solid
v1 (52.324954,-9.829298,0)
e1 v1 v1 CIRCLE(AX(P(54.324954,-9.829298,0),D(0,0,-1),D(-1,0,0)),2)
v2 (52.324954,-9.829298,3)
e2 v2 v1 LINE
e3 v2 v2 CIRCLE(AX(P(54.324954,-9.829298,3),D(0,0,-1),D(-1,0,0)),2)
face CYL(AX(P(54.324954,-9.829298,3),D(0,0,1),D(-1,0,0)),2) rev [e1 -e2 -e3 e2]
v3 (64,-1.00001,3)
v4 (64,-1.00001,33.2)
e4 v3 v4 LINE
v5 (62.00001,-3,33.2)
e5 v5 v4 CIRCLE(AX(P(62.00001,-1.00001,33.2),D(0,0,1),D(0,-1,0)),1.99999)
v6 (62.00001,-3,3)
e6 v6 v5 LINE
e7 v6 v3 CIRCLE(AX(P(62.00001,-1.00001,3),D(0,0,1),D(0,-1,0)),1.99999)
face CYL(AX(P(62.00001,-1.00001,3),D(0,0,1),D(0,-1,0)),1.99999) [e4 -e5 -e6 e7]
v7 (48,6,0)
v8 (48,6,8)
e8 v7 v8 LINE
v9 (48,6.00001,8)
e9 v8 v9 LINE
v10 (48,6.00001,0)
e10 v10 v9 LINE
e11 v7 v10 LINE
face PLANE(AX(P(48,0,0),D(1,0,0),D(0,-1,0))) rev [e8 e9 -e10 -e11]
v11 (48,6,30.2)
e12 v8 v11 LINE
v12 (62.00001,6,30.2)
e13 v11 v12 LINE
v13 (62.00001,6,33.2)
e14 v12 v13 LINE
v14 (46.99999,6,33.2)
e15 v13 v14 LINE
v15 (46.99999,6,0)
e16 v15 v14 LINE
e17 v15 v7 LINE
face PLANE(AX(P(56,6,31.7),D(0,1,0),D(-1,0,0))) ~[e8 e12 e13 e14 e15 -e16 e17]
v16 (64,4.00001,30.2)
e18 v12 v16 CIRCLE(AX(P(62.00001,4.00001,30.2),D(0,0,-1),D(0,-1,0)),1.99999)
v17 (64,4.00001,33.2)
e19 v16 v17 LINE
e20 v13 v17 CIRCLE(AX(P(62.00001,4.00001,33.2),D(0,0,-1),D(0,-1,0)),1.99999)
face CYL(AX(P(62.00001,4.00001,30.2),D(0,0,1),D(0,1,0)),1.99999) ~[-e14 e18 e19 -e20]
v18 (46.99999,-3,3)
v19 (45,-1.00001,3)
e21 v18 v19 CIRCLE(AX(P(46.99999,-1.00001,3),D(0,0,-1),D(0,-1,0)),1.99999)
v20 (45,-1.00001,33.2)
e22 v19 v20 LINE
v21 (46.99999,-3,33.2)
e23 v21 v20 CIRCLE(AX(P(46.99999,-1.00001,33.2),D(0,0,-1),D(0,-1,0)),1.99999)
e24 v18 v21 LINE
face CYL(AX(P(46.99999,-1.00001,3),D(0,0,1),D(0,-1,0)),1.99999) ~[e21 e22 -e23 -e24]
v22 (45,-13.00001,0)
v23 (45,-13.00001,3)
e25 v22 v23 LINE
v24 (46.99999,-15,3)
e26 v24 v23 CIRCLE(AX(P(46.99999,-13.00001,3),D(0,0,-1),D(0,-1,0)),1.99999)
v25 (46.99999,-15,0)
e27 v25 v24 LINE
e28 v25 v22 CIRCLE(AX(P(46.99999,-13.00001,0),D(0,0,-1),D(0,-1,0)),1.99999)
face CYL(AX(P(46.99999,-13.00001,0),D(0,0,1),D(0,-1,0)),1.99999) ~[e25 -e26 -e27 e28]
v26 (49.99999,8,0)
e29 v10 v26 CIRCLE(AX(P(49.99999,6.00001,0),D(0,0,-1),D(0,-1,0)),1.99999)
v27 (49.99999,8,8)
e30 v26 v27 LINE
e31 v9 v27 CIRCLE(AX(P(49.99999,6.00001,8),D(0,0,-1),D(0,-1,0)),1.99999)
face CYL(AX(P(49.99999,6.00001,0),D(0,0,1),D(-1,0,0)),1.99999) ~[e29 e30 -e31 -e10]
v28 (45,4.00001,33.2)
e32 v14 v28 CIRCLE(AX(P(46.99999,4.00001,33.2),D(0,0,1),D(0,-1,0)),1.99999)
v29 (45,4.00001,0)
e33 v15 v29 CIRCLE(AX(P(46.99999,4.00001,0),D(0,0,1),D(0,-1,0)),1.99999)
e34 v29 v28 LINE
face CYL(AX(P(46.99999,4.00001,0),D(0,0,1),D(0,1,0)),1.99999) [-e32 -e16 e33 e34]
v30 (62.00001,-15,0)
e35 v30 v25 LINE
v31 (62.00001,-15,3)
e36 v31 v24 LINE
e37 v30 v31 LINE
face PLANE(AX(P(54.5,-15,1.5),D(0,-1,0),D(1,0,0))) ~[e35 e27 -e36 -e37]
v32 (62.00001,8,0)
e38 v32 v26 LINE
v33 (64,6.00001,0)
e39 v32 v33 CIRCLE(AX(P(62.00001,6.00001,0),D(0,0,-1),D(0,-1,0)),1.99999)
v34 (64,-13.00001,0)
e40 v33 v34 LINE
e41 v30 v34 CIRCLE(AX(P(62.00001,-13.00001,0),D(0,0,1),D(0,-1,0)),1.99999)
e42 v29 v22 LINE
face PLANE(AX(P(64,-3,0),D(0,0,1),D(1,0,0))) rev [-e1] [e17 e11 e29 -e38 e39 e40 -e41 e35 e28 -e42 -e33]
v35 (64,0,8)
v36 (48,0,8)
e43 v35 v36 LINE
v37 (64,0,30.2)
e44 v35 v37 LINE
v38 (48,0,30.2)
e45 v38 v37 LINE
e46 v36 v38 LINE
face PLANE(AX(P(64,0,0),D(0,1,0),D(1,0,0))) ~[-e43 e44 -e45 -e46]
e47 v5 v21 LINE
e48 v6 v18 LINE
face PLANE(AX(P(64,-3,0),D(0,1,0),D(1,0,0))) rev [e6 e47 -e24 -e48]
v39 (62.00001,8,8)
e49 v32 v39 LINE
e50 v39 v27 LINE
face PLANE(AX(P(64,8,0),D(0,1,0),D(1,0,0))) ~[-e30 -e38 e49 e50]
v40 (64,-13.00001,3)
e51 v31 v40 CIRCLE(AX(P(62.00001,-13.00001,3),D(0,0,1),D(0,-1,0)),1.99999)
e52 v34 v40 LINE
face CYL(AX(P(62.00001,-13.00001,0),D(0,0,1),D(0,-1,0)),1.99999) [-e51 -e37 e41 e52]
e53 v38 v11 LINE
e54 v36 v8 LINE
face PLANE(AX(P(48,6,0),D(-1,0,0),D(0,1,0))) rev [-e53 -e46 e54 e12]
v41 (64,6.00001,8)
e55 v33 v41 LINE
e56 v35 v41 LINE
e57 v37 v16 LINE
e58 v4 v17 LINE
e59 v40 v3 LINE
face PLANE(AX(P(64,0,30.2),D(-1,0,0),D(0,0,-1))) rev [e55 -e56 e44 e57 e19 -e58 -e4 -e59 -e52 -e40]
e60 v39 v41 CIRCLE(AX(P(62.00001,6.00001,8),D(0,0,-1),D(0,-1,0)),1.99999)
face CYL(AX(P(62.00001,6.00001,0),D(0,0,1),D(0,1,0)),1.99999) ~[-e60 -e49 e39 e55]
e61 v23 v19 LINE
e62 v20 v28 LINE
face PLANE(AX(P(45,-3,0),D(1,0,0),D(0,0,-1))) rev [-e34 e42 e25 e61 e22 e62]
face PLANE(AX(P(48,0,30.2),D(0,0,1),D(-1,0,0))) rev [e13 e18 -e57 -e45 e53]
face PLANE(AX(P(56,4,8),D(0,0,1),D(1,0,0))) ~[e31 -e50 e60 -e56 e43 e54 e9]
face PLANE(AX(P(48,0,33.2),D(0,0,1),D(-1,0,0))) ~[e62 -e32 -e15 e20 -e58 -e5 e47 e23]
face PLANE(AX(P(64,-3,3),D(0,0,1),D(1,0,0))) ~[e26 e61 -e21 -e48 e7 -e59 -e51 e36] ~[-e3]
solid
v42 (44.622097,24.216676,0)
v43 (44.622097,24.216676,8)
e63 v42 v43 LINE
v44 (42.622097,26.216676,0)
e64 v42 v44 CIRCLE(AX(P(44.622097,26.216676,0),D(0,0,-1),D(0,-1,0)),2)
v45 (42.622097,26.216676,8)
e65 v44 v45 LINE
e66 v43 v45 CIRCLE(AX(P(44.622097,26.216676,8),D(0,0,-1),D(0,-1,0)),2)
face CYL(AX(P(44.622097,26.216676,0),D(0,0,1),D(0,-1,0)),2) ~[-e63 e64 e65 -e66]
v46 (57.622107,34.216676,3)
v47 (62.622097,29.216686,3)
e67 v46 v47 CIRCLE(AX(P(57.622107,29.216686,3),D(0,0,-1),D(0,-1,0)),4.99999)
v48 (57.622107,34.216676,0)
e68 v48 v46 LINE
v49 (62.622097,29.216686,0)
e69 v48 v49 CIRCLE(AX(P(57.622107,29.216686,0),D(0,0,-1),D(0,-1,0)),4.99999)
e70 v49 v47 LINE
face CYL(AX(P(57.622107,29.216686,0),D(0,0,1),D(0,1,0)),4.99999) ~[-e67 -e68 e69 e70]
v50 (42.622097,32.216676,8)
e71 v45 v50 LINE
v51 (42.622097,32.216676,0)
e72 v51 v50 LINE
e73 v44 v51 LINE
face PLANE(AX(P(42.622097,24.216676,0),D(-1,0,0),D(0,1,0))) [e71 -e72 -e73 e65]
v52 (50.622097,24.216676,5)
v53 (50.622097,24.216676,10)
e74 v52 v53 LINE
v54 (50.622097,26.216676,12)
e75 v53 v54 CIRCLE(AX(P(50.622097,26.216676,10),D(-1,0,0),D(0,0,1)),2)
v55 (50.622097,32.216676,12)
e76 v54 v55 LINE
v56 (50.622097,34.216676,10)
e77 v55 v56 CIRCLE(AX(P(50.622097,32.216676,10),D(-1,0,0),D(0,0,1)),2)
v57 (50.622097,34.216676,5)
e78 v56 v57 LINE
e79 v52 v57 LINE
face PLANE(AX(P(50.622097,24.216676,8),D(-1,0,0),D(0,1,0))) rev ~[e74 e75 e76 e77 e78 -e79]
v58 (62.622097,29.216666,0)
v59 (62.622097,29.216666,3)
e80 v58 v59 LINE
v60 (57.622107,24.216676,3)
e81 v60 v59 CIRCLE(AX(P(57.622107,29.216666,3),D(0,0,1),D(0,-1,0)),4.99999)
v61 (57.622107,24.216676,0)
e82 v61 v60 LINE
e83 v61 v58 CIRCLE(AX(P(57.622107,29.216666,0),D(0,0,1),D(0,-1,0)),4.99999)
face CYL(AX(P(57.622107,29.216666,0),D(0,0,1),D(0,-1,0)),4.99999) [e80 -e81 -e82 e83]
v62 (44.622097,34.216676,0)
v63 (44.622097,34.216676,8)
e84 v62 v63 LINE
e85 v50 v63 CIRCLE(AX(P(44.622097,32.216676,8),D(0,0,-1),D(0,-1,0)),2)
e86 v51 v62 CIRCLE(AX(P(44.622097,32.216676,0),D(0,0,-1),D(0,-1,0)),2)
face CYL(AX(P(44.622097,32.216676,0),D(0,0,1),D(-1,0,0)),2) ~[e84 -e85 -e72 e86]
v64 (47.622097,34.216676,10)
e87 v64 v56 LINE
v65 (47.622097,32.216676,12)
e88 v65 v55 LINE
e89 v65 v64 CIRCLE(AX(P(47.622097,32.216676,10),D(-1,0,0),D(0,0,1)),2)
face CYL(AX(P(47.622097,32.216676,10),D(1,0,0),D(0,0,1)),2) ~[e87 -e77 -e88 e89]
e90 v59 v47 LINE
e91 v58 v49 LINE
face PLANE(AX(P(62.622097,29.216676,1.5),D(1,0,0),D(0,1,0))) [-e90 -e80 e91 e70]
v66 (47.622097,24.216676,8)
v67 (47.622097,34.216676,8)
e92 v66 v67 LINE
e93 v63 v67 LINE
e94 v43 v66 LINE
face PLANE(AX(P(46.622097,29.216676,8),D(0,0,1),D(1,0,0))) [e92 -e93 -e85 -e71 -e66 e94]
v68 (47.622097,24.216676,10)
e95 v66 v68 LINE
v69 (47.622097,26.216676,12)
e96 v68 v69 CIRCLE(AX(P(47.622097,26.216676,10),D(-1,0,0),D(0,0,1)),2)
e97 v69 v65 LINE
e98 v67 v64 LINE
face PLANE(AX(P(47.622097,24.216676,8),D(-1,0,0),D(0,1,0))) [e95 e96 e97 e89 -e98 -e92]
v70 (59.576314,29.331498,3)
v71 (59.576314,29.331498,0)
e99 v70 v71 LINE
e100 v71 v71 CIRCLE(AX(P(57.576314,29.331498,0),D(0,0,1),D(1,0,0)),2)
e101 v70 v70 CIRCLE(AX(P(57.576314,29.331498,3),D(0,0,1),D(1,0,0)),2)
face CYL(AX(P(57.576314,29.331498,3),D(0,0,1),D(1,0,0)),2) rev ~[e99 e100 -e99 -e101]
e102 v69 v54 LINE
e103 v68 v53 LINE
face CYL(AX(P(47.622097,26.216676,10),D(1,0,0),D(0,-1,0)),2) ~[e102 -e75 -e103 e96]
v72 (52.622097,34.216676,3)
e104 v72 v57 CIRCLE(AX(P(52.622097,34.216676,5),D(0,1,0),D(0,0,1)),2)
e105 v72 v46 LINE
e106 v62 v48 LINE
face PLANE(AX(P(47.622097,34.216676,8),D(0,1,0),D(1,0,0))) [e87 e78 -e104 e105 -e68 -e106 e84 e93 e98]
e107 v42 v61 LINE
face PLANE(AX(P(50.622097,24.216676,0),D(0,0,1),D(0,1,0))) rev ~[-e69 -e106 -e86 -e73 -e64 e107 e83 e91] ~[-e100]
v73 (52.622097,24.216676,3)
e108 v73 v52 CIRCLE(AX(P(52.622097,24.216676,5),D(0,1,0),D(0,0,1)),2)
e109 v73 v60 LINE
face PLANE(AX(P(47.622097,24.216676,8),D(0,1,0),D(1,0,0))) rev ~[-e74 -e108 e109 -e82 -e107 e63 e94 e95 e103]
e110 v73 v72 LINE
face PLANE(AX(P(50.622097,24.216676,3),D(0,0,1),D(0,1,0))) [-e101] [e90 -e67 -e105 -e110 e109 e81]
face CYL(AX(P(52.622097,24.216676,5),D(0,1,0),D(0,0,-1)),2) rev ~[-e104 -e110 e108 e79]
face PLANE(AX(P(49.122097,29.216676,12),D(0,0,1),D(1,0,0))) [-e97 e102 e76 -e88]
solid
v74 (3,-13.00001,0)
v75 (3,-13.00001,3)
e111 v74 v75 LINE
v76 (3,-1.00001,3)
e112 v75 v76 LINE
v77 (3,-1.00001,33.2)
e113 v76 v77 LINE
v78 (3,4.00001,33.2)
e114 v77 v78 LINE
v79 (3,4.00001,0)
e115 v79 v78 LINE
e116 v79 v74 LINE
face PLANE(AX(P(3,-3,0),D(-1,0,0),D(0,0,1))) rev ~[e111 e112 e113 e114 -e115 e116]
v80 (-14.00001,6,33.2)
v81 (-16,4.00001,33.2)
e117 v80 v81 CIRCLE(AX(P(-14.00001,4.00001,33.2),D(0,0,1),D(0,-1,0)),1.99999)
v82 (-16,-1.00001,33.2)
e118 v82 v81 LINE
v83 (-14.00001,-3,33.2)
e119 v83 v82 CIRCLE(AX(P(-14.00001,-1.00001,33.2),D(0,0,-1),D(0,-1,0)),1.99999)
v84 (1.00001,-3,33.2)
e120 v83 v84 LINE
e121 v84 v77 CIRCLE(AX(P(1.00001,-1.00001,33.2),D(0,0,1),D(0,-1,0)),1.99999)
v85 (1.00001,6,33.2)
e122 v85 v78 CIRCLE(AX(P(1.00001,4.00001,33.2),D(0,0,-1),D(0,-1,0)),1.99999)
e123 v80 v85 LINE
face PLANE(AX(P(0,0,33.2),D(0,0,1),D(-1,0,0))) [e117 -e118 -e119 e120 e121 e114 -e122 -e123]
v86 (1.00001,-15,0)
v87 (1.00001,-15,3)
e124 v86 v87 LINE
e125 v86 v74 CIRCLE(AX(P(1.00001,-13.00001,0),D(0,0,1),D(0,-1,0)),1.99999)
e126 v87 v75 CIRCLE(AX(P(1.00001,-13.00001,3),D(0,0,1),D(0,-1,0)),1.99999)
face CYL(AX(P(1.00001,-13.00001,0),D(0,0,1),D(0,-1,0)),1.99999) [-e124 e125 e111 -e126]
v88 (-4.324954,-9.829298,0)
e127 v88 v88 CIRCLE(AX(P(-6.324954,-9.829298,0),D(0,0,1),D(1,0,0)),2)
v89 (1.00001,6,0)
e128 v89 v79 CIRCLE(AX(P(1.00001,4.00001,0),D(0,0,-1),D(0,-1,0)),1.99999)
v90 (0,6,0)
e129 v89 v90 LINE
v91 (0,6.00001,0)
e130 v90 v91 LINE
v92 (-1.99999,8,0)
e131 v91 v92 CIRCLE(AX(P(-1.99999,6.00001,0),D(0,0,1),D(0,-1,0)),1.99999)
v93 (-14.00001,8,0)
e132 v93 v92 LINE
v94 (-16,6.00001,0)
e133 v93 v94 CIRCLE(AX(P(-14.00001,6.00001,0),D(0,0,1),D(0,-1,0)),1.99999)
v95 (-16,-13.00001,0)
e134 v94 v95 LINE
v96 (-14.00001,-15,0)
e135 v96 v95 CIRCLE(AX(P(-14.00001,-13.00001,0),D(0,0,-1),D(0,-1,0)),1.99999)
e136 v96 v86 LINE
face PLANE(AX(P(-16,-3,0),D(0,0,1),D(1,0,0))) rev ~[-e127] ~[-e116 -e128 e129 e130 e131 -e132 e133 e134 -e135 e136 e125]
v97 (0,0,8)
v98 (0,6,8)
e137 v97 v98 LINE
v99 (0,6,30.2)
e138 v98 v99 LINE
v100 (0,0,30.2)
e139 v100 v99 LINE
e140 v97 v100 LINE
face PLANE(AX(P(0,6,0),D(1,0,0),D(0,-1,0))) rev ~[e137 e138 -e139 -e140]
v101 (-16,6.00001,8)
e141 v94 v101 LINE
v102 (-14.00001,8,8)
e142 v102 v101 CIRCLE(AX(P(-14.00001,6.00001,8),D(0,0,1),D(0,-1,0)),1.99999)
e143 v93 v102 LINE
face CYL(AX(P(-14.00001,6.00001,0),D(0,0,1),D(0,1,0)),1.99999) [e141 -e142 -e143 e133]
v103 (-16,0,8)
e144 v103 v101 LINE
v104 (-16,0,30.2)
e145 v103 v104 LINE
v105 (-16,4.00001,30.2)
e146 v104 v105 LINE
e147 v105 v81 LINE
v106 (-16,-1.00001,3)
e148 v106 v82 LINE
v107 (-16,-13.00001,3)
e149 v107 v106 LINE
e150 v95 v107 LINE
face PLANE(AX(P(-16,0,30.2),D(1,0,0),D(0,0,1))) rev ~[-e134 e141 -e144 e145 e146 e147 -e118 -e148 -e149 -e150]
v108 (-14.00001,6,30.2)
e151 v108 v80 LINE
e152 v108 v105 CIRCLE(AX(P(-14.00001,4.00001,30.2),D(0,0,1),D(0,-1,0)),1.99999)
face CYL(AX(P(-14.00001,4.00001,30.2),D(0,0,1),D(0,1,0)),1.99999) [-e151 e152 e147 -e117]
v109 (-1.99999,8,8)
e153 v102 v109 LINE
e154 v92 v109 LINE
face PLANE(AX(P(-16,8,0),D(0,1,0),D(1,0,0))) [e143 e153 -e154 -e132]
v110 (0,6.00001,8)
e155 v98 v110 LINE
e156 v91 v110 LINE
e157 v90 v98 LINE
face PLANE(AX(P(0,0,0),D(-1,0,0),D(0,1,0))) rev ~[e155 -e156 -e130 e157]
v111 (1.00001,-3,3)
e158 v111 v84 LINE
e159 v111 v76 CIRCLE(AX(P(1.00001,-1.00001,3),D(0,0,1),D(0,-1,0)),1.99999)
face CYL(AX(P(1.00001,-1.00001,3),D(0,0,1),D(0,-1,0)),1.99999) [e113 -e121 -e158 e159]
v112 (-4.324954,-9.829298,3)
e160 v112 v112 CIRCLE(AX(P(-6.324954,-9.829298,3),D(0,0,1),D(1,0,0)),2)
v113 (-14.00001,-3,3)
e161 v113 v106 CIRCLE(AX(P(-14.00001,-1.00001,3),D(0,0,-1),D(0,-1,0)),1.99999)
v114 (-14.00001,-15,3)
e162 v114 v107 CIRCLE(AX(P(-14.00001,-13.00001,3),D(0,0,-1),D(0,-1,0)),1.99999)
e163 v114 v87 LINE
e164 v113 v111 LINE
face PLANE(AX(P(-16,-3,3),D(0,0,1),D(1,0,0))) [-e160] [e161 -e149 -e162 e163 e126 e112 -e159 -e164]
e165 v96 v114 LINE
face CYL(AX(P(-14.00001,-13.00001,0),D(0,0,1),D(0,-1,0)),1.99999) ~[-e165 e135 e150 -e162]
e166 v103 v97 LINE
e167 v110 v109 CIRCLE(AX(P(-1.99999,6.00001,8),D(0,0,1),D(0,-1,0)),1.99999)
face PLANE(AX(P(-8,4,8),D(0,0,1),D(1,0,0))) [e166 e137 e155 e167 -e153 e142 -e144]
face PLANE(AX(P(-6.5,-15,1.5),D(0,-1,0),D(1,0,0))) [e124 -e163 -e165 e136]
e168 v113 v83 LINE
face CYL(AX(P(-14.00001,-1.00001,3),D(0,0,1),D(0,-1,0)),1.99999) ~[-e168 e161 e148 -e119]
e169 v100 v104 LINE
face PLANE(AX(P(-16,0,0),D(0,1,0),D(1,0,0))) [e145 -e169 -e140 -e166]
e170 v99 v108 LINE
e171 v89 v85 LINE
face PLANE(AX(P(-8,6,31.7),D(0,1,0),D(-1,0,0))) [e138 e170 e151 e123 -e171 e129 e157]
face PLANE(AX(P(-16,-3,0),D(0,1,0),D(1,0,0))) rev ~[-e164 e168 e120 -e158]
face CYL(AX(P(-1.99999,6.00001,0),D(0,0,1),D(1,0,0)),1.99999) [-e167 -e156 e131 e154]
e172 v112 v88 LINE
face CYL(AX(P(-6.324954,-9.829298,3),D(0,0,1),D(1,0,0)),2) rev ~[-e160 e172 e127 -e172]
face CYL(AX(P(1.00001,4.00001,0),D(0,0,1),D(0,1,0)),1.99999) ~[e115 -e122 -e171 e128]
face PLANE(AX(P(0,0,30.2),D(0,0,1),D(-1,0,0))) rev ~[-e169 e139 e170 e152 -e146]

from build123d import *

# Parameters (mm, degrees)
F0_W      = 16
F0_H      = 8
F1_DEPTH  = 8
F2_W      = 16
F2_H      = 3
F3_DEPTH  = 33.2
F4_W      = 19
F4_H      = 3
F5_DEPTH  = 12
F6_R      = 2
F7_DEPTH  = 3
F8_W      = 16
F8_H      = 3
F9_DEPTH  = 6
F10_R     = 1.99999
F13_W     = 8
F13_H     = 10
F14_DEPTH = 8
F15_W     = 10
F15_H     = 3
F16_DEPTH = 12
F17_W     = 3
F17_H     = 10
F18_DEPTH = 4
F19_R     = 2
F20_DEPTH = 3
F21_R     = 4.99999
F22_R     = 2


# Not quite as in the source:
# - a fillet or chamfer is up to 0.001 mm smaller than in the source, because OpenCascade refuses the exact size


with BuildPart() as f1:
    # F0 (on Top) → F1 (new body)
    with BuildSketch(Plane.XY):
        with Locations((-8, 4)):
            Rectangle(F0_W, F0_H)
    extrude(amount=F1_DEPTH)

    # F2 (on Top) → F3 (join)
    with BuildSketch(Plane.XY):
        with Locations((-8, -1.5)):
            Rectangle(F2_W, F2_H)
        Polygon((0, 6), (0, 0), (0, -3), (3, -3), (3, 6), align=None)
    extrude(amount=F3_DEPTH)

    # F4 (on face) → F5 (join)
    with BuildSketch(Plane.XZ.offset(3)):
        with Locations((-6.5, 1.5)):
            Rectangle(F4_W, F4_H)
    extrude(amount=F5_DEPTH)

    # F6 (on face) → F7 (cut, through all)
    with BuildSketch(Plane.XY.offset(3)):
        with Locations((-6.3249543309, -9.8292976618)):
            Circle(F6_R)
    extrude(amount=-F7_DEPTH, mode=Mode.SUBTRACT)

    # F8 (on face) → F9 (join)
    with BuildSketch(Plane(origin=(0, 0, 0), x_dir=(-1, 0, 0), z_dir=(0, 1, 0))):
        with Locations((8, 31.7)):
            Rectangle(F8_W, F8_H)
    extrude(amount=F9_DEPTH)

    # F10 (radius 2 in the source; OpenCascade refuses exactly that, so slightly less here)
    f10_edges = [f1.edges().sort_by_distance(p)[0] for p in [
        (-16, 6, 31.7),
        (-16, 8, 4),
        (0, 8, 4),
        (3, 6, 16.6),
        (3, -15, 1.5),
        (3, -3, 18.1),
        (-16, -3, 18.1),
        (-16, -15, 1.5),
    ]]
    fillet(f10_edges, radius=F10_R)


with BuildPart() as f12_1:
    # F12: instance of F1
    add(f1.part.mirror(Plane.YZ.offset(24)))


with BuildPart() as f14:
    # F13 (on Top) → F14 (new body)
    with BuildSketch(Plane.XY):
        with Locations((46.6220968366, 29.2166761309)):
            Rectangle(F13_W, F13_H)
    extrude(amount=F14_DEPTH)

    # F15 (on face) → F16 (join)
    with BuildSketch(Plane.YZ.offset(50.6220968366)):
        with Locations((29.2166761309, 1.5)):
            Rectangle(F15_W, F15_H)
    extrude(amount=F16_DEPTH)

    # F17 (on face) → F18 (join)
    with BuildSketch(Plane.XY.offset(8)):
        with Locations((49.1220968366, 29.2166761309)):
            Rectangle(F17_W, F17_H)
    extrude(amount=F18_DEPTH)

    # F19 (on face) → F20 (cut, through all)
    with BuildSketch(Plane.XY.offset(3)):
        with Locations((57.5763136148, 29.331497848)):
            Circle(F19_R)
    extrude(amount=-F20_DEPTH, mode=Mode.SUBTRACT)

    # F21 (radius 5 in the source; OpenCascade refuses exactly that, so slightly less here)
    f21_edges = [f14.edges().sort_by_distance(p)[0] for p in [
        (62.622097, 34.216676, 1.5),
        (62.622097, 24.216676, 1.5),
    ]]
    fillet(f21_edges, radius=F21_R)

    # F22
    f22_edges = [f14.edges().sort_by_distance(p)[0] for p in [
        (50.622097, 29.216676, 3),
        (49.122097, 34.216676, 12),
        (49.122097, 24.216676, 12),
        (42.622097, 34.216676, 4),
        (42.622097, 24.216676, 4),
    ]]
    fillet(f22_edges, radius=F22_R)


solid = Compound([f1.part, f12_1.part, f14.part])
